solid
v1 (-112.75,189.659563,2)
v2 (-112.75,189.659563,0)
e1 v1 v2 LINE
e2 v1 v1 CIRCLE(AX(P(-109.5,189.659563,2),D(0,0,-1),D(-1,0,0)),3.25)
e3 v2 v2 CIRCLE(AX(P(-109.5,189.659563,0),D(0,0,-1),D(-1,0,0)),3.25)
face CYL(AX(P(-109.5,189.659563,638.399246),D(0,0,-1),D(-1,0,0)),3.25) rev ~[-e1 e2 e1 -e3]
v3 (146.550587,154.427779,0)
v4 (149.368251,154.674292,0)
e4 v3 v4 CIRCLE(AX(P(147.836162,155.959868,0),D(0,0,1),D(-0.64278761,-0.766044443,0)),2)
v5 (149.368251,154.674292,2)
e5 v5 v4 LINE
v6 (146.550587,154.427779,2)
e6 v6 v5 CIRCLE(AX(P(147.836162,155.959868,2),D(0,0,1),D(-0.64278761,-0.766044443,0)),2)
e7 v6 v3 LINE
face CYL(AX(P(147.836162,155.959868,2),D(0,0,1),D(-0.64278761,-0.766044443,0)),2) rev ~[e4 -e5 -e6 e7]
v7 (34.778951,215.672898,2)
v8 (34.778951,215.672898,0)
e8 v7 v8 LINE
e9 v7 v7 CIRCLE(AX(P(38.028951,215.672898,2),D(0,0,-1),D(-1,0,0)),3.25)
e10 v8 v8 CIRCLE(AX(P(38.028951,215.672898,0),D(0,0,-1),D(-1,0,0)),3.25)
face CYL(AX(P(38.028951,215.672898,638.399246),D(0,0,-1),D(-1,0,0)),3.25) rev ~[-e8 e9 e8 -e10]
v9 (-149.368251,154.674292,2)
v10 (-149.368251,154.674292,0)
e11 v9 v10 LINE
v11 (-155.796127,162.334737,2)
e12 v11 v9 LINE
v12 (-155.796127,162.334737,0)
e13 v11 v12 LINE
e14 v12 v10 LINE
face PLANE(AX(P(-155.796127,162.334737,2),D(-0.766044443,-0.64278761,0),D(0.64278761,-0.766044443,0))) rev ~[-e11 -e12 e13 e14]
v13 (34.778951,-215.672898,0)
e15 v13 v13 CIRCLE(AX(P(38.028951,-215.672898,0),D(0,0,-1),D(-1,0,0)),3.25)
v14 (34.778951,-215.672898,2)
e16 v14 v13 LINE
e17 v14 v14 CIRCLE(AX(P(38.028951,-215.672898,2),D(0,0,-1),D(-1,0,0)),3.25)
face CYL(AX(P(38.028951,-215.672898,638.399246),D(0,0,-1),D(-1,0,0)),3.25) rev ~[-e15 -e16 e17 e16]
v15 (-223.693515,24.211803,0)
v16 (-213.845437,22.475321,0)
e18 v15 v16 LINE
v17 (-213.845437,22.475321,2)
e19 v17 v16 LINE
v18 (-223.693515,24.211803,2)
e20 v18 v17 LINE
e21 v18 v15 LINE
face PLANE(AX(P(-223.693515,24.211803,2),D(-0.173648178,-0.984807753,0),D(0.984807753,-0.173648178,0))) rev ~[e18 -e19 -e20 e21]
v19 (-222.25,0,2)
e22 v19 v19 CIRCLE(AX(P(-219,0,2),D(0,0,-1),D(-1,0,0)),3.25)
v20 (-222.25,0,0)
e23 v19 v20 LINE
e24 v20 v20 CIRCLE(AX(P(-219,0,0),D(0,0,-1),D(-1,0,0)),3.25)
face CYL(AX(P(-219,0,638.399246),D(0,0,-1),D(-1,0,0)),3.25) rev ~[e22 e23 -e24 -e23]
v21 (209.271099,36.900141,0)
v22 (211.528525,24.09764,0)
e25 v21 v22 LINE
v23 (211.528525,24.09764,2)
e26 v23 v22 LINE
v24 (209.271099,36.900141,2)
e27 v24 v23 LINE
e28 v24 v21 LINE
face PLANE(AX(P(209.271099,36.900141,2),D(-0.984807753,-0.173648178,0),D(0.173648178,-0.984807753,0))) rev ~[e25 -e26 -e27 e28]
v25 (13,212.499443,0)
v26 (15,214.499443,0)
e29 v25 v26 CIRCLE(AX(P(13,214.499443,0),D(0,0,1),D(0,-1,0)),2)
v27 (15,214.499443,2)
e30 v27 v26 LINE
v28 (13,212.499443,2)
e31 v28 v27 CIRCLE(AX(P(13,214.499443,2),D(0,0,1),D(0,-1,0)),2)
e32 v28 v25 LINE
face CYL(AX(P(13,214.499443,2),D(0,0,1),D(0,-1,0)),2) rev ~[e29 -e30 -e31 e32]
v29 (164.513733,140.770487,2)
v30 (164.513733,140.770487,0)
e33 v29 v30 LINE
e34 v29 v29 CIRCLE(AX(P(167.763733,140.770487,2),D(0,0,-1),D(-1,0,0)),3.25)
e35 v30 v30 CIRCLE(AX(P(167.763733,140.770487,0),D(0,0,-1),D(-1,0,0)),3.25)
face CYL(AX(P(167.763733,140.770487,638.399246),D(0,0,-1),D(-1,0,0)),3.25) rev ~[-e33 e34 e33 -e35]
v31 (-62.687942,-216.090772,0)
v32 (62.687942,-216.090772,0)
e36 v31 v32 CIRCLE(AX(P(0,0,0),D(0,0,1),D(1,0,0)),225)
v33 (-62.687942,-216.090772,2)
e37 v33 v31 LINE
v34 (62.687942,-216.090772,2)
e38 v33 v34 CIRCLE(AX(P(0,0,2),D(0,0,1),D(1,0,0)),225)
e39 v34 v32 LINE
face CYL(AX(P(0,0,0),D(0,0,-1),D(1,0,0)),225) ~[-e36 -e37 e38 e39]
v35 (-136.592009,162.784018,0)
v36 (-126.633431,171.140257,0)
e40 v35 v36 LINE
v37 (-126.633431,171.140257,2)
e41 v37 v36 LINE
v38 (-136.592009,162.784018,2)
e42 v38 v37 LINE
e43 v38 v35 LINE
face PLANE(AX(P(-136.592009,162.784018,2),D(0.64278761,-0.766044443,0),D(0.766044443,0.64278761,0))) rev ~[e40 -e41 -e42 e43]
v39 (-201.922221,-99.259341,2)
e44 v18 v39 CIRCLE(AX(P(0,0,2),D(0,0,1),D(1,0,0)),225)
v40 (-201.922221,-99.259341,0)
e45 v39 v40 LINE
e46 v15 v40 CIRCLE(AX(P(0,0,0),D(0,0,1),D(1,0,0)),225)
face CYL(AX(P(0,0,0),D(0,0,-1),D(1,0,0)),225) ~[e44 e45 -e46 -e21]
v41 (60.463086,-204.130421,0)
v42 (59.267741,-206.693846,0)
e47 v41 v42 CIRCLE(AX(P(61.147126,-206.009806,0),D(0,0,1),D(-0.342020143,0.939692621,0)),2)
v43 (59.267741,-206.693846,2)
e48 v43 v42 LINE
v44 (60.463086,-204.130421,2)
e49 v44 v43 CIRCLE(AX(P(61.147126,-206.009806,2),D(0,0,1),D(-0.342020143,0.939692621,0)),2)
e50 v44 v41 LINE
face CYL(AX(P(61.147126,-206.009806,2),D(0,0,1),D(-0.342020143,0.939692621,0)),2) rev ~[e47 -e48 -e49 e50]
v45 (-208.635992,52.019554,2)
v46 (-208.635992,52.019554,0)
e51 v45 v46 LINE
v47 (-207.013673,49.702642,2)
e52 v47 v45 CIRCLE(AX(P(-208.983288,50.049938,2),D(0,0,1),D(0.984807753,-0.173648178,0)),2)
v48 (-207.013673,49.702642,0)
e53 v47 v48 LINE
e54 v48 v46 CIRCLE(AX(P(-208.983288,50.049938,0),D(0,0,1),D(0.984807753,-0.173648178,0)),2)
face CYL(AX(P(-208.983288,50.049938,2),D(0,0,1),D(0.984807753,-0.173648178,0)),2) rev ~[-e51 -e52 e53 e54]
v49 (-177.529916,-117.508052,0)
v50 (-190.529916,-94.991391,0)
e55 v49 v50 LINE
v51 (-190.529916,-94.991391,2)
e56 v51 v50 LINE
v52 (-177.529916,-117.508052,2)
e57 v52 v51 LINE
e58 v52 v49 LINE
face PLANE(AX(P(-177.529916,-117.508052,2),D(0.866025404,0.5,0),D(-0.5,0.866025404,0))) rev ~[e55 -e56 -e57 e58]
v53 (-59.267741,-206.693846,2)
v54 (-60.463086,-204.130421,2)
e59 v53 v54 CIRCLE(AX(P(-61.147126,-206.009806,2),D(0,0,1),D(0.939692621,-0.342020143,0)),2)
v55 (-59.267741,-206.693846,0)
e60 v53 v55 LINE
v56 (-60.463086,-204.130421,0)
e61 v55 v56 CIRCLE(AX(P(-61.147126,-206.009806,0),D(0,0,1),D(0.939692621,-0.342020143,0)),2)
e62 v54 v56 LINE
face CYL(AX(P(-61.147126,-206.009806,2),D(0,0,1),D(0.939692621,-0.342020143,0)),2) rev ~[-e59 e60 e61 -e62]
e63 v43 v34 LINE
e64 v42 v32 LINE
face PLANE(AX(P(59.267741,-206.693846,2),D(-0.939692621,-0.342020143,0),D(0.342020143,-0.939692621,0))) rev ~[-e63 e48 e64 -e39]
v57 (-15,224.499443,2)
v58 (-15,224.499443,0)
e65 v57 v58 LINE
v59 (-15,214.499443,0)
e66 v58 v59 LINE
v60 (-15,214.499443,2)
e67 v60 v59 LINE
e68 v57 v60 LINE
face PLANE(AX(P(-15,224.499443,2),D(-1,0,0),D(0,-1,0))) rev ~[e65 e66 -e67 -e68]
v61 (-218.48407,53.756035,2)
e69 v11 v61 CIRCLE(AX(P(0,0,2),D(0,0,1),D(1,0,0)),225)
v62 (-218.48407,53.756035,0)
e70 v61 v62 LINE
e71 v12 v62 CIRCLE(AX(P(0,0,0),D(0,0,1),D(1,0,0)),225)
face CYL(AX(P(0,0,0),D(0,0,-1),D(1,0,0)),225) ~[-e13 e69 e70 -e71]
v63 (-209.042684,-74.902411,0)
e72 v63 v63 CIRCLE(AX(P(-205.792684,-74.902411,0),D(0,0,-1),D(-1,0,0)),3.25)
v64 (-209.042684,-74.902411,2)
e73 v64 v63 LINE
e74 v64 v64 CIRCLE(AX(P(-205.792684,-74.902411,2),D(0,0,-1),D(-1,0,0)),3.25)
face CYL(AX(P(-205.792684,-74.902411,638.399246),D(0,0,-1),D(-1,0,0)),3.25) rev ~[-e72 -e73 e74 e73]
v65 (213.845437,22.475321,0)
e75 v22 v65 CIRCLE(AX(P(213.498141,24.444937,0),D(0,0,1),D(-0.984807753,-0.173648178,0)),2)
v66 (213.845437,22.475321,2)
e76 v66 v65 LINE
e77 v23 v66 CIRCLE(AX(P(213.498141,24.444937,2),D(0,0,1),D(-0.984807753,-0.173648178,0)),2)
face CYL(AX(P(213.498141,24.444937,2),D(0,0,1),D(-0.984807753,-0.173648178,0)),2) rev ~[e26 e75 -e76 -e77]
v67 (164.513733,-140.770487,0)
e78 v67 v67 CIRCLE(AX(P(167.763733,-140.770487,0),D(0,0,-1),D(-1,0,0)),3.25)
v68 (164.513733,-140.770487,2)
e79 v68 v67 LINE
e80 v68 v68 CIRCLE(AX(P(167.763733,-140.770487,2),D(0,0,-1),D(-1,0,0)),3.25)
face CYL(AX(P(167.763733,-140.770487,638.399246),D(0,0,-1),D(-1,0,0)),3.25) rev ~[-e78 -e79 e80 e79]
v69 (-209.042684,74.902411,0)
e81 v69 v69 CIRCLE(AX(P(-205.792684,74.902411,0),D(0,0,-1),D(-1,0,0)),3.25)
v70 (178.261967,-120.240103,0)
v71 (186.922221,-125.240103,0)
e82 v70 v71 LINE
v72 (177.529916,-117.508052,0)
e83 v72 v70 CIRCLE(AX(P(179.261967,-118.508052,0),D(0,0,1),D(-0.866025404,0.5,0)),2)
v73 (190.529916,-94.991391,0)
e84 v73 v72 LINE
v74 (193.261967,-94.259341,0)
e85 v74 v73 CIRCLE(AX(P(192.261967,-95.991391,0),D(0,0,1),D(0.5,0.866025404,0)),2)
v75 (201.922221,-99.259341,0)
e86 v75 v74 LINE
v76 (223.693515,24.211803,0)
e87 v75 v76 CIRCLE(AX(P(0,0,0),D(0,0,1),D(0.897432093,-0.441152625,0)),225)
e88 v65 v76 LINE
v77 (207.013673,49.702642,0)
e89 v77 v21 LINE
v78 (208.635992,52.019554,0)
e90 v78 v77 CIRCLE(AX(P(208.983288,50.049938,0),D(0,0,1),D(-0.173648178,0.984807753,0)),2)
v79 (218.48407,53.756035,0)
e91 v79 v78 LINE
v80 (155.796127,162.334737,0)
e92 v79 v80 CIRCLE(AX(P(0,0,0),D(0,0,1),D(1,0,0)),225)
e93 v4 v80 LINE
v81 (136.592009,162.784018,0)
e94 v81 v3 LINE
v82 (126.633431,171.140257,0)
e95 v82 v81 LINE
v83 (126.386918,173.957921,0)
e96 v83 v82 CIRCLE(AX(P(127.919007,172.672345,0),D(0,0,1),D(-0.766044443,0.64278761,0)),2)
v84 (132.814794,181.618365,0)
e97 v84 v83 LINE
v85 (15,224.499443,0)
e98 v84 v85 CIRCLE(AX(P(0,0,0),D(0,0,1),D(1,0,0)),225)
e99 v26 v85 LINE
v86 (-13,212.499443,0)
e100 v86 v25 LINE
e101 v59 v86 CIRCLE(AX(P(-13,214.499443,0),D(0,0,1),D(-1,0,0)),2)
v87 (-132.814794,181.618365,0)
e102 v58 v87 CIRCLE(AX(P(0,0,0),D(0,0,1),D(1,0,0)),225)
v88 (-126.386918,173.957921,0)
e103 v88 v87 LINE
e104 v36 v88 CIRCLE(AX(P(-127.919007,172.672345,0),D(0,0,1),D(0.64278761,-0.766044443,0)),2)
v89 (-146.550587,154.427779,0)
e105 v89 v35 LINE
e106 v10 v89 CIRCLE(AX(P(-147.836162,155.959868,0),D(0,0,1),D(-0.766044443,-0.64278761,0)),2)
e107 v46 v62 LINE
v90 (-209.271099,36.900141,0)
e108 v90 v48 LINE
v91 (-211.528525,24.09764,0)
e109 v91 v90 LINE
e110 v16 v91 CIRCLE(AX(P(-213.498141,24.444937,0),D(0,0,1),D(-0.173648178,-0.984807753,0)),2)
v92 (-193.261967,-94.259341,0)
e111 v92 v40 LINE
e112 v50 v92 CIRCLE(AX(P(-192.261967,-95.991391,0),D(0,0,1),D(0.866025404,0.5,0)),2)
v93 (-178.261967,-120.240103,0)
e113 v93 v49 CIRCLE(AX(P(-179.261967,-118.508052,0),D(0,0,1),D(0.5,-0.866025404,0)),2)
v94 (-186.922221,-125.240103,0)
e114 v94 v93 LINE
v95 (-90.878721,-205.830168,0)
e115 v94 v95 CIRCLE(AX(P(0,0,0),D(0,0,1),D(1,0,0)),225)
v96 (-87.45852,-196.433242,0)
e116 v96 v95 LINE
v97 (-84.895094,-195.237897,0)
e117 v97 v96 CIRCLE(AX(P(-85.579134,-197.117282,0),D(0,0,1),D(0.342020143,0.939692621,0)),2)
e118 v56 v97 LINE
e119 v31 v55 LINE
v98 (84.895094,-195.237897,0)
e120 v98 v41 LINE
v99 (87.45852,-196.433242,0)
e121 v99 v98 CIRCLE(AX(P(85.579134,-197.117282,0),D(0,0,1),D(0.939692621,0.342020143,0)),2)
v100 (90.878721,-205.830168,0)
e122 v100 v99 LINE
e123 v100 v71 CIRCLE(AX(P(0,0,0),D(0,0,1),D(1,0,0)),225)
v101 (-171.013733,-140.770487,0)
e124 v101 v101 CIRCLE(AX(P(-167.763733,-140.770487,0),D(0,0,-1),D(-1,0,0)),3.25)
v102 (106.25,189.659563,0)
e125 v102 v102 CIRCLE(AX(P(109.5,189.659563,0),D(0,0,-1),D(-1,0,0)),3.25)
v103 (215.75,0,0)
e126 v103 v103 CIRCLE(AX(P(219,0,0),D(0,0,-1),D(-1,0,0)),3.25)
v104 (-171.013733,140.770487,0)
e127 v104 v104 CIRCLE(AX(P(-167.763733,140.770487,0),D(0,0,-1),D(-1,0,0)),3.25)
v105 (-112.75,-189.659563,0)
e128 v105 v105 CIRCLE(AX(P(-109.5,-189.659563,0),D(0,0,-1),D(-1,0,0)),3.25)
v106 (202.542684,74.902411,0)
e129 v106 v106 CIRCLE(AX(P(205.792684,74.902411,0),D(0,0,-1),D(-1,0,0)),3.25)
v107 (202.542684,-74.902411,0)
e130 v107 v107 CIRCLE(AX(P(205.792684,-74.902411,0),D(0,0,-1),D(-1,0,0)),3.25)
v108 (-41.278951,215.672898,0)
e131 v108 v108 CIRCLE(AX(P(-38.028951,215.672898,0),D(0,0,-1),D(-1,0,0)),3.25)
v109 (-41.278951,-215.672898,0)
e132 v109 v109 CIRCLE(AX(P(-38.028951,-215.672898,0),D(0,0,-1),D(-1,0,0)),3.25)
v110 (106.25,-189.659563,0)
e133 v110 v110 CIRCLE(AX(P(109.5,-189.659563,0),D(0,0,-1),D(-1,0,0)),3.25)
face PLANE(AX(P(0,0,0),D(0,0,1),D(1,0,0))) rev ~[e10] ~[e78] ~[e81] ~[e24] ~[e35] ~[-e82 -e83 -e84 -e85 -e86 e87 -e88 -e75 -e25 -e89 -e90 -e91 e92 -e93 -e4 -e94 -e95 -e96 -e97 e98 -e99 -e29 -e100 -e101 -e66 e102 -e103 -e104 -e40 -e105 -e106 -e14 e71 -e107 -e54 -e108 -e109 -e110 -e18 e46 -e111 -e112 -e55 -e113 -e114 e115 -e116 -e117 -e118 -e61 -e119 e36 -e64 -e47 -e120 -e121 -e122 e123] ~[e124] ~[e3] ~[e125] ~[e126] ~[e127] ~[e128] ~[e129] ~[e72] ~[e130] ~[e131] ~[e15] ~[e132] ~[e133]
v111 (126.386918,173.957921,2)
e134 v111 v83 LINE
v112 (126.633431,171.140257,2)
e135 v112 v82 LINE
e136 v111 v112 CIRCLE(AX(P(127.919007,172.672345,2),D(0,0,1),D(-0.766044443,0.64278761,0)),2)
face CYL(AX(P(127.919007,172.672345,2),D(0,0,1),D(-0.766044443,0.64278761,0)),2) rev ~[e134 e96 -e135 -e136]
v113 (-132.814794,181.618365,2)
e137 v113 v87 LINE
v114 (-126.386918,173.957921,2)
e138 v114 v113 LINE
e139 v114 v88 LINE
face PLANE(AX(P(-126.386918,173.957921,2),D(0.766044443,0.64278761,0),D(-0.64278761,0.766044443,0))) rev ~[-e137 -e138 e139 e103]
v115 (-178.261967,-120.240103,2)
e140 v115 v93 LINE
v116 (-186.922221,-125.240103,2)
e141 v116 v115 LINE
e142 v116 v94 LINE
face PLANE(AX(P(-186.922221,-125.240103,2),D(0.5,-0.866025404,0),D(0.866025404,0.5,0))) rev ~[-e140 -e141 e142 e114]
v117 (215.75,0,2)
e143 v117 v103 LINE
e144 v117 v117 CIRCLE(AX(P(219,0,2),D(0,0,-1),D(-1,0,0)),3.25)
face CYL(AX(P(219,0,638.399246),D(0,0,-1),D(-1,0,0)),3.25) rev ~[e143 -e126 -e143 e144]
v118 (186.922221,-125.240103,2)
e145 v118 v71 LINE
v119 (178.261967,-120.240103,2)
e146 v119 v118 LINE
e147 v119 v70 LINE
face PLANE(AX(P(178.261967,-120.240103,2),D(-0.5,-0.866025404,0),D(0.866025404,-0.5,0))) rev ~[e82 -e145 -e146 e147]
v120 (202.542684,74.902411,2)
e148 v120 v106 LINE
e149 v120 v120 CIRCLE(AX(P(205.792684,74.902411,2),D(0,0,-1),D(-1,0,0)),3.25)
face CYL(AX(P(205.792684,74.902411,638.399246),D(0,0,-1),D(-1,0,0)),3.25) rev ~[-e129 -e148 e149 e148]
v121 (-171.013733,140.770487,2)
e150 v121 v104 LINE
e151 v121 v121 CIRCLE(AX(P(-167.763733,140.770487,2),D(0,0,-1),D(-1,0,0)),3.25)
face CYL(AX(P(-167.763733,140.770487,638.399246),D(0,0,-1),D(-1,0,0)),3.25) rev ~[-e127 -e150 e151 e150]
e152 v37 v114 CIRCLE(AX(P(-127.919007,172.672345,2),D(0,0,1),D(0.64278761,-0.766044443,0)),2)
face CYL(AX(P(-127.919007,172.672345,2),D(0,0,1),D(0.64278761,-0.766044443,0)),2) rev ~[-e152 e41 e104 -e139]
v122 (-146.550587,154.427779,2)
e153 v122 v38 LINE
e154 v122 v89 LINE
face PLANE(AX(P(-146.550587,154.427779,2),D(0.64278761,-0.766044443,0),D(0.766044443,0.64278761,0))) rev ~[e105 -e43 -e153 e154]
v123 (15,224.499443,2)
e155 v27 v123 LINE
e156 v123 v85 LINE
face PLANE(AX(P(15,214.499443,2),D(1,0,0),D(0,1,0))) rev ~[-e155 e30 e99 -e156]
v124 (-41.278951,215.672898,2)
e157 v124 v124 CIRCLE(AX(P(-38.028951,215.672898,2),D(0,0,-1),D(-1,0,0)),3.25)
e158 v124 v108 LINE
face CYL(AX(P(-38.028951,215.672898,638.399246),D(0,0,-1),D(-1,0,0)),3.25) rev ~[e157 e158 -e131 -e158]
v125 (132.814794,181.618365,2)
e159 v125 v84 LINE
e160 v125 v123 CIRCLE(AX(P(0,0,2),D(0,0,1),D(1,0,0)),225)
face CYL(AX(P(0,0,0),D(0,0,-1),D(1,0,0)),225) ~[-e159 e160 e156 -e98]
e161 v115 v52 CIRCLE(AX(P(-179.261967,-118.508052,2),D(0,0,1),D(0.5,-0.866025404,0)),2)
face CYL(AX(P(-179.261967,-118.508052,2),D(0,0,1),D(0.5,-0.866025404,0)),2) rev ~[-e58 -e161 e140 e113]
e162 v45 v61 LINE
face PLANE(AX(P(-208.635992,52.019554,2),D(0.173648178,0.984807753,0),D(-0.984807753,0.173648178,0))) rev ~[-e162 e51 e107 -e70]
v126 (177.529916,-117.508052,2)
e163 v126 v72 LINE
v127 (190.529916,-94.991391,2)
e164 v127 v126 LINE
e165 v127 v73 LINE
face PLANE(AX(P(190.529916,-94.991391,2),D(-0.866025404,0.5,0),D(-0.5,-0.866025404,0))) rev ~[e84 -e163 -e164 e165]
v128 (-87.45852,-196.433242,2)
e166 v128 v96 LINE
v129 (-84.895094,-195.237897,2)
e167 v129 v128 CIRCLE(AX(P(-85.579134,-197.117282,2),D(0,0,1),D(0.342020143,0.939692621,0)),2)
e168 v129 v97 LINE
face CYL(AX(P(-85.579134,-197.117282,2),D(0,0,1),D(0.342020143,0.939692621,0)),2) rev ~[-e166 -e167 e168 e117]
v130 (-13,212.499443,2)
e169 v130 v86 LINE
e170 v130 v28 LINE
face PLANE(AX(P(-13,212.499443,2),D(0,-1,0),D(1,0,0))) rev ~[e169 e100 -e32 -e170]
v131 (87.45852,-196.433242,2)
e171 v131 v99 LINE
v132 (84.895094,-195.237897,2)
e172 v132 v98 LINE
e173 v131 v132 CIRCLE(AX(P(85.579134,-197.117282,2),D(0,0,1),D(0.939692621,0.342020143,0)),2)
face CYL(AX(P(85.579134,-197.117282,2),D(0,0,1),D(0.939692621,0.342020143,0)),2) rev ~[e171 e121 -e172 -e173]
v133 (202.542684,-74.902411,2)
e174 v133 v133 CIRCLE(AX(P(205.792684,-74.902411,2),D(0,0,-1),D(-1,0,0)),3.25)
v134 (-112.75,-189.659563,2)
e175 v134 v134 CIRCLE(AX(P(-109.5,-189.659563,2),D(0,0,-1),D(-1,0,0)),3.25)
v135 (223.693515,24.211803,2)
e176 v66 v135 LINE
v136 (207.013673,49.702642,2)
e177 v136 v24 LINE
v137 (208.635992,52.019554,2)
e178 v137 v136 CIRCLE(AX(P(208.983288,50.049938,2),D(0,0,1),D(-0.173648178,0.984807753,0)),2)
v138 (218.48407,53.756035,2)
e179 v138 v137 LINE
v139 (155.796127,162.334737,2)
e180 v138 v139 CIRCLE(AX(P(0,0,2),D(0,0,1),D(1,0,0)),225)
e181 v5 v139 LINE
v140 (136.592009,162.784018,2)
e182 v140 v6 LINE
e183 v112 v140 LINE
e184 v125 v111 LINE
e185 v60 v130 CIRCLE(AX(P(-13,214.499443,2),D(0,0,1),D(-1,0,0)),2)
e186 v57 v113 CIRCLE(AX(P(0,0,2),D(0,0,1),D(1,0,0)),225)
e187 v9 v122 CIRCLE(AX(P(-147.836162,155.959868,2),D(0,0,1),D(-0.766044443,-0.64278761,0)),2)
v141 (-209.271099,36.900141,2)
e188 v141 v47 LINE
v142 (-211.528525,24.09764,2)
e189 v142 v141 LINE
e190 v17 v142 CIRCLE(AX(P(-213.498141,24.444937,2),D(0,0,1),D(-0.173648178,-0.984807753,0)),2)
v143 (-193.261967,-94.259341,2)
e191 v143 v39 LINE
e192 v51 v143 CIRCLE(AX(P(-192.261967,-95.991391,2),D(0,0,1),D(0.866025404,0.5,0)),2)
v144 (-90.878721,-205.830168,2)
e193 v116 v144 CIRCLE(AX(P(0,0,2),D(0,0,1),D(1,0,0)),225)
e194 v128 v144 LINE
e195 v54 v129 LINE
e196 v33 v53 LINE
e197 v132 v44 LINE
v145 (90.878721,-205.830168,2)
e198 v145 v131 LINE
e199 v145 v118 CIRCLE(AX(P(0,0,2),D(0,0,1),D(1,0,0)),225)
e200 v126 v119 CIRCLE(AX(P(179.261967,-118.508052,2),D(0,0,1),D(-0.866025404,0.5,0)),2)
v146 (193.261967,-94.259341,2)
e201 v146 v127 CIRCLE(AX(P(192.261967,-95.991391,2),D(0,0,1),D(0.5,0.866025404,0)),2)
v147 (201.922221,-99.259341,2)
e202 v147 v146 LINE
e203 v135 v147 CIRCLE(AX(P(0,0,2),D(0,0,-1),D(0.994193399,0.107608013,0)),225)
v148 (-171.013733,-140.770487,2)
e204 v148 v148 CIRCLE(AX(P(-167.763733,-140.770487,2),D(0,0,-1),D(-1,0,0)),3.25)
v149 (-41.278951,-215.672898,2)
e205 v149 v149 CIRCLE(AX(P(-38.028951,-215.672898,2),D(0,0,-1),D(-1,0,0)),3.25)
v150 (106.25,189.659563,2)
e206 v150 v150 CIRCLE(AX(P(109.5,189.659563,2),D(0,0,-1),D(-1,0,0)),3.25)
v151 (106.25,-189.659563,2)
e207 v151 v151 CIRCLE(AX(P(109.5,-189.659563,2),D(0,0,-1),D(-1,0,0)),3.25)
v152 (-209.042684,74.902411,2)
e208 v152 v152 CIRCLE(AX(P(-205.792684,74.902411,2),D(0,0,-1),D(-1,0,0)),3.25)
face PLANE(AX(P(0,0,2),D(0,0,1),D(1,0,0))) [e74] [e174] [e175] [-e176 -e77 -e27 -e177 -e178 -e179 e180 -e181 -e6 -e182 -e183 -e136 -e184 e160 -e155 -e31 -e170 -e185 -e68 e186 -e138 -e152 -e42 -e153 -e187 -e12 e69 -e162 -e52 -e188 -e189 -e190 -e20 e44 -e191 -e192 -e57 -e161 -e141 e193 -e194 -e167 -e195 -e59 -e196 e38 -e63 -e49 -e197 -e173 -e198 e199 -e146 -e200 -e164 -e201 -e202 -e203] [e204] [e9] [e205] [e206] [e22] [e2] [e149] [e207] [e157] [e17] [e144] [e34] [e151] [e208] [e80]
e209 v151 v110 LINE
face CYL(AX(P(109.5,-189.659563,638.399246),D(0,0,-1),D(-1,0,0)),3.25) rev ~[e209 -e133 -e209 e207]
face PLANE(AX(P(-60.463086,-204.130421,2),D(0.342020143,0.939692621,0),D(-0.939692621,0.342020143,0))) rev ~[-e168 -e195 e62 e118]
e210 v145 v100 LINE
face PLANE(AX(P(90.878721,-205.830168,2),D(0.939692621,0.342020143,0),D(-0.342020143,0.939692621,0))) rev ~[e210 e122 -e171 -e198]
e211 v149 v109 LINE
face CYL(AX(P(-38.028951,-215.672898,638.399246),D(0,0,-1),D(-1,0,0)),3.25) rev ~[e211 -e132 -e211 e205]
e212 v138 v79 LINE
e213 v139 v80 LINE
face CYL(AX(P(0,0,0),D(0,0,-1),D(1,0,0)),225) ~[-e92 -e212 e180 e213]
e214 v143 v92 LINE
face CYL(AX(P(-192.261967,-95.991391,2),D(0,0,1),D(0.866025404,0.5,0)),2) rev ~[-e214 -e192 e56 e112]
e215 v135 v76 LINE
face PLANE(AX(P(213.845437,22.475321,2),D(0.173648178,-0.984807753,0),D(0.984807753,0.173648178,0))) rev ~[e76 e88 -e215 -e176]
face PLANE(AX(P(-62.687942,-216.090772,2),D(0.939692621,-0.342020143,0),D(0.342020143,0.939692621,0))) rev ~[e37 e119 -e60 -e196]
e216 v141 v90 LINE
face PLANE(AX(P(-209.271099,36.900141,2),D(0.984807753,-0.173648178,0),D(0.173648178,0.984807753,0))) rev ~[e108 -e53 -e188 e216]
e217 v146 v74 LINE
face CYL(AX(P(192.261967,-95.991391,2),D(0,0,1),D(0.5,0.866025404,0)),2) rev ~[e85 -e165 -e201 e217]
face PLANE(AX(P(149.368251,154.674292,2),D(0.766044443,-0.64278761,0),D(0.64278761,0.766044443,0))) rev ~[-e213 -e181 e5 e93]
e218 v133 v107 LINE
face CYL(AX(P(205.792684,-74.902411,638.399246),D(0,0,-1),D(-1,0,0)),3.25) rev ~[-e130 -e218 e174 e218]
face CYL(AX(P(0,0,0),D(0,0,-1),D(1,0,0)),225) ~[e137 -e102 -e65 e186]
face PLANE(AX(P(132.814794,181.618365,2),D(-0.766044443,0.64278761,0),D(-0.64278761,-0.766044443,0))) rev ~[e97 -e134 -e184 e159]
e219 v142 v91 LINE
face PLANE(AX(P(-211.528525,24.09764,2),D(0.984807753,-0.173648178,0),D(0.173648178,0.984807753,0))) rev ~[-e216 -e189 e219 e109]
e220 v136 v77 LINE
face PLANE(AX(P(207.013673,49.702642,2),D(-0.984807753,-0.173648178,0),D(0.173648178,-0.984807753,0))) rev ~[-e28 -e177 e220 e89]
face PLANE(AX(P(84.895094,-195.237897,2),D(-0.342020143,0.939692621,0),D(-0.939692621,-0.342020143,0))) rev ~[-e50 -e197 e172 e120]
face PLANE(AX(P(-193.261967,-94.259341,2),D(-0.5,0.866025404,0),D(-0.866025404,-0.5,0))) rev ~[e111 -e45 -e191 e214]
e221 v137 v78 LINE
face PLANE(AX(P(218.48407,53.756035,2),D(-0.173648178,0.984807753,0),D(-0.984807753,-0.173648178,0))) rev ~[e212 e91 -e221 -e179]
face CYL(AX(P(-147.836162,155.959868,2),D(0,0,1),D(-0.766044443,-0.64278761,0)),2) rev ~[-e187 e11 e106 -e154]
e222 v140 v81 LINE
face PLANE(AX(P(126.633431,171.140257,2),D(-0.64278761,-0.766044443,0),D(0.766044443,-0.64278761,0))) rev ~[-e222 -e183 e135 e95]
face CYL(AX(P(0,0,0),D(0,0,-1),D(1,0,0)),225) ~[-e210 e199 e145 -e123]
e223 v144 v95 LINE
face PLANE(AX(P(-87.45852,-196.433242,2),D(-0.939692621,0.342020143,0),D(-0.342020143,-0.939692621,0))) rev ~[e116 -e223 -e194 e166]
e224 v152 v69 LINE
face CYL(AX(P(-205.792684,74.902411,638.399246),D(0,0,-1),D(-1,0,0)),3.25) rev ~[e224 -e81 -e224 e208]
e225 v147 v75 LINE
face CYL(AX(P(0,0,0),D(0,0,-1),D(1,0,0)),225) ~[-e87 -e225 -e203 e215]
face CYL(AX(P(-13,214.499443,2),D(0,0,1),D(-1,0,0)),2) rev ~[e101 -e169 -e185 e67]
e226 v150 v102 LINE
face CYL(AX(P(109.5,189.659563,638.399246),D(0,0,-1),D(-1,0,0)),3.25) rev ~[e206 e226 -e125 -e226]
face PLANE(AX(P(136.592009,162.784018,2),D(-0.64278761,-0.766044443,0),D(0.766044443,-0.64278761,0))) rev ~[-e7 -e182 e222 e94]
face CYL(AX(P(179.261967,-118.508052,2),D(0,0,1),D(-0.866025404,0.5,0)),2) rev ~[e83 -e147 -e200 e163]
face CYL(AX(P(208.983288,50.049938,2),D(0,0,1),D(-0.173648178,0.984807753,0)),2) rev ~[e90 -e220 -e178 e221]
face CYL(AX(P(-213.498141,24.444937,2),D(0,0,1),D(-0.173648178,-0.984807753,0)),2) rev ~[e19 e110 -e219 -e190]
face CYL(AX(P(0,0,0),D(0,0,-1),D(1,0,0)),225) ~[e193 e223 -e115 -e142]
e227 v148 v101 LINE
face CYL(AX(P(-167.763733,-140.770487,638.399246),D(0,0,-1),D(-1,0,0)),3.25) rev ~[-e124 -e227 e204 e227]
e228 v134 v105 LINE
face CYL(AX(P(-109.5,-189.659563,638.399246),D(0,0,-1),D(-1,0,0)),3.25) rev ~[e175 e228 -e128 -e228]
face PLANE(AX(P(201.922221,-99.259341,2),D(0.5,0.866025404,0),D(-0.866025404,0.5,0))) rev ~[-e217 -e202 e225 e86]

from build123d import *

# Parameters (mm, degrees)
F0_R     = 225
F1_DEPTH = 2
F3_D     = 6.5
F5_DEPTH = 2.001


# Not quite as in the source:
# - a feature names something its author has since deleted; it is built from what else it names


with BuildPart() as f1:
    # F0 (on Top) → F1 (new body)
    with BuildSketch(Plane.XY):
        Circle(F0_R)
    extrude(amount=F1_DEPTH)

    # F3 (through all)
    with Locations(Plane.XY.offset(2)):
        with Locations((219, 0), (205.7926839521, 74.9024113883), (167.7637330431, 140.7704865214), (109.5, 189.6595634288), (38.0289509091, 215.6728979097), (-38.0289509091, 215.6728979097), (-109.5, 189.6595634288), (-167.7637330431, 140.7704865214), (-205.7926839521, 74.9024113883), (-219, 0), (-205.7926839521, -74.9024113883), (-167.7637330431, -140.7704865214), (-109.5, -189.6595634288), (-38.0289509091, -215.6728979097), (38.0289509091, -215.6728979097), (109.5, -189.6595634288), (167.7637330431, -140.7704865214), (205.7926839521, -74.9024113883)):
            Hole(F3_D / 2)

    # F4 (on face) → F5 (cut, through all)
    with BuildSketch(Plane.XY.offset(2)):
        with BuildLine():
            ThreePointArc((223.6935148816, 24.2118029049), (221.5817444277, 39.0708399751), (218.4840695516, 53.7560354952))
            Line((218.4840695516, 53.7560354952), (208.6359920215, 52.0195537186))
            ThreePointArc((208.6359920215, 52.0195537186), (207.3449842883, 51.1970910852), (207.0136728708, 49.7026418572))
            Line((207.0136728708, 49.7026418572), (209.2710991805, 36.900141068))
            Line((209.2710991805, 36.900141068), (211.5285254901, 24.0976402789))
            ThreePointArc((211.5285254901, 24.0976402789), (212.3509881235, 22.8066325456), (213.8454373515, 22.4753211282))
            Line((213.8454373515, 22.4753211282), (223.6935148816, 24.2118029049))
        make_face()
        with BuildLine():
            Line((149.3682510245, 154.6742923751), (155.7961271214, 162.3347368063))
            ThreePointArc((155.7961271214, 162.3347368063), (144.6272121795, 172.3599997018), (132.8147938278, 181.6183650969))
            Line((132.8147938278, 181.6183650969), (126.386917731, 173.9579206657))
            ThreePointArc((126.386917731, 173.9579206657), (125.926617221, 172.4980339608), (126.6334313978, 171.1402565601))
            Line((126.6334313978, 171.1402565601), (136.5920091584, 162.7840176342))
            Line((136.5920091584, 162.7840176342), (146.5505869189, 154.4277787082))
            ThreePointArc((146.5505869189, 154.4277787082), (148.0104736238, 153.9674781983), (149.3682510245, 154.6742923751))
        make_face()
        with BuildLine():
            Line((15, 214.4994432064), (15, 224.4994432064))
            ThreePointArc((15, 224.4994432064), (0, 225), (-15, 224.4994432064))
            Line((-15, 224.4994432064), (-15, 214.4994432064))
            ThreePointArc((-15, 214.4994432064), (-14.4142135624, 213.0852296441), (-13, 212.4994432064))
            Line((-13, 212.4994432064), (0, 212.4994432064))
            Line((0, 212.4994432064), (13, 212.4994432064))
            ThreePointArc((13, 212.4994432064), (14.4142135624, 213.0852296441), (15, 214.4994432064))
        make_face()
        with BuildLine():
            Line((-126.386917731, 173.9579206657), (-132.8147938278, 181.6183650969))
            ThreePointArc((-132.8147938278, 181.6183650969), (-144.6272121795, 172.3599997018), (-155.7961271214, 162.3347368063))
            Line((-155.7961271214, 162.3347368063), (-149.3682510245, 154.6742923751))
            ThreePointArc((-149.3682510245, 154.6742923751), (-148.0104736238, 153.9674781983), (-146.5505869189, 154.4277787082))
            Line((-146.5505869189, 154.4277787082), (-136.5920091584, 162.7840176342))
            Line((-136.5920091584, 162.7840176342), (-126.6334313978, 171.1402565601))
            ThreePointArc((-126.6334313978, 171.1402565601), (-125.926617221, 172.4980339608), (-126.386917731, 173.9579206657))
        make_face()
        with BuildLine():
            Line((-208.6359920215, 52.0195537186), (-218.4840695516, 53.7560354952))
            ThreePointArc((-218.4840695516, 53.7560354952), (-221.5817444277, 39.0708399751), (-223.6935148816, 24.2118029049))
            Line((-223.6935148816, 24.2118029049), (-213.8454373515, 22.4753211282))
            ThreePointArc((-213.8454373515, 22.4753211282), (-212.3509881235, 22.8066325456), (-211.5285254901, 24.0976402789))
            Line((-211.5285254901, 24.0976402789), (-209.2710991805, 36.900141068))
            Line((-209.2710991805, 36.900141068), (-207.0136728708, 49.7026418572))
            ThreePointArc((-207.0136728708, 49.7026418572), (-207.3449842883, 51.1970910852), (-208.6359920215, 52.0195537186))
        make_face()
        with BuildLine():
            ThreePointArc((-201.9222209522, -99.2593405465), (-194.8557158515, -112.5), (-186.9222209522, -125.24010266))
            Line((-186.9222209522, -125.24010266), (-178.2619669144, -120.24010266))
            ThreePointArc((-178.2619669144, -120.24010266), (-177.3301152618, -119.0256899426), (-177.5299161068, -117.5080518524))
            Line((-177.5299161068, -117.5080518524), (-184.0299161068, -106.2497216032))
            Line((-184.0299161068, -106.2497216032), (-190.5299161068, -94.991391354))
            ThreePointArc((-190.5299161068, -94.991391354), (-191.7443288242, -94.0595397014), (-193.2619669144, -94.2593405465))
            Line((-193.2619669144, -94.2593405465), (-201.9222209522, -99.2593405465))
        make_face()
        with BuildLine():
            ThreePointArc((-90.8787210538, -205.8301680017), (-76.9545322483, -211.4308396768), (-62.6879424302, -216.0907723015))
            Line((-62.6879424302, -216.0907723015), (-59.267740997, -206.6938460937))
            ThreePointArc((-59.267740997, -206.6938460937), (-59.3345106645, -205.1645692835), (-60.4630859519, -204.1304205654))
            Line((-60.4630859519, -204.1304205654), (-72.6790900221, -199.6841587022))
            Line((-72.6790900221, -199.6841587022), (-84.8950940923, -195.237896839))
            ThreePointArc((-84.8950940923, -195.237896839), (-86.4243709024, -195.3046665065), (-87.4585196205, -196.4332417939))
            Line((-87.4585196205, -196.4332417939), (-90.8787210538, -205.8301680017))
        make_face()
        with BuildLine():
            ThreePointArc((62.6879424302, -216.0907723015), (76.9545322483, -211.4308396768), (90.8787210538, -205.8301680017))
            Line((90.8787210538, -205.8301680017), (87.4585196205, -196.4332417939))
            ThreePointArc((87.4585196205, -196.4332417939), (86.4243709024, -195.3046665065), (84.8950940923, -195.237896839))
            Line((84.8950940923, -195.237896839), (72.6790900221, -199.6841587022))
            Line((72.6790900221, -199.6841587022), (60.4630859519, -204.1304205654))
            ThreePointArc((60.4630859519, -204.1304205654), (59.3345106645, -205.1645692835), (59.267740997, -206.6938460937))
            Line((59.267740997, -206.6938460937), (62.6879424302, -216.0907723015))
        make_face()
        with BuildLine():
            ThreePointArc((186.9222209522, -125.24010266), (194.8557158515, -112.5), (201.9222209522, -99.2593405465))
            Line((201.9222209522, -99.2593405465), (193.2619669144, -94.2593405465))
            ThreePointArc((193.2619669144, -94.2593405465), (191.7443288242, -94.0595397014), (190.5299161068, -94.991391354))
            Line((190.5299161068, -94.991391354), (184.0299161068, -106.2497216032))
            Line((184.0299161068, -106.2497216032), (177.5299161068, -117.5080518524))
            ThreePointArc((177.5299161068, -117.5080518524), (177.3301152618, -119.0256899426), (178.2619669144, -120.24010266))
            Line((178.2619669144, -120.24010266), (186.9222209522, -125.24010266))
        make_face()
    extrude(amount=-F5_DEPTH, mode=Mode.SUBTRACT)


solid = f1.part
